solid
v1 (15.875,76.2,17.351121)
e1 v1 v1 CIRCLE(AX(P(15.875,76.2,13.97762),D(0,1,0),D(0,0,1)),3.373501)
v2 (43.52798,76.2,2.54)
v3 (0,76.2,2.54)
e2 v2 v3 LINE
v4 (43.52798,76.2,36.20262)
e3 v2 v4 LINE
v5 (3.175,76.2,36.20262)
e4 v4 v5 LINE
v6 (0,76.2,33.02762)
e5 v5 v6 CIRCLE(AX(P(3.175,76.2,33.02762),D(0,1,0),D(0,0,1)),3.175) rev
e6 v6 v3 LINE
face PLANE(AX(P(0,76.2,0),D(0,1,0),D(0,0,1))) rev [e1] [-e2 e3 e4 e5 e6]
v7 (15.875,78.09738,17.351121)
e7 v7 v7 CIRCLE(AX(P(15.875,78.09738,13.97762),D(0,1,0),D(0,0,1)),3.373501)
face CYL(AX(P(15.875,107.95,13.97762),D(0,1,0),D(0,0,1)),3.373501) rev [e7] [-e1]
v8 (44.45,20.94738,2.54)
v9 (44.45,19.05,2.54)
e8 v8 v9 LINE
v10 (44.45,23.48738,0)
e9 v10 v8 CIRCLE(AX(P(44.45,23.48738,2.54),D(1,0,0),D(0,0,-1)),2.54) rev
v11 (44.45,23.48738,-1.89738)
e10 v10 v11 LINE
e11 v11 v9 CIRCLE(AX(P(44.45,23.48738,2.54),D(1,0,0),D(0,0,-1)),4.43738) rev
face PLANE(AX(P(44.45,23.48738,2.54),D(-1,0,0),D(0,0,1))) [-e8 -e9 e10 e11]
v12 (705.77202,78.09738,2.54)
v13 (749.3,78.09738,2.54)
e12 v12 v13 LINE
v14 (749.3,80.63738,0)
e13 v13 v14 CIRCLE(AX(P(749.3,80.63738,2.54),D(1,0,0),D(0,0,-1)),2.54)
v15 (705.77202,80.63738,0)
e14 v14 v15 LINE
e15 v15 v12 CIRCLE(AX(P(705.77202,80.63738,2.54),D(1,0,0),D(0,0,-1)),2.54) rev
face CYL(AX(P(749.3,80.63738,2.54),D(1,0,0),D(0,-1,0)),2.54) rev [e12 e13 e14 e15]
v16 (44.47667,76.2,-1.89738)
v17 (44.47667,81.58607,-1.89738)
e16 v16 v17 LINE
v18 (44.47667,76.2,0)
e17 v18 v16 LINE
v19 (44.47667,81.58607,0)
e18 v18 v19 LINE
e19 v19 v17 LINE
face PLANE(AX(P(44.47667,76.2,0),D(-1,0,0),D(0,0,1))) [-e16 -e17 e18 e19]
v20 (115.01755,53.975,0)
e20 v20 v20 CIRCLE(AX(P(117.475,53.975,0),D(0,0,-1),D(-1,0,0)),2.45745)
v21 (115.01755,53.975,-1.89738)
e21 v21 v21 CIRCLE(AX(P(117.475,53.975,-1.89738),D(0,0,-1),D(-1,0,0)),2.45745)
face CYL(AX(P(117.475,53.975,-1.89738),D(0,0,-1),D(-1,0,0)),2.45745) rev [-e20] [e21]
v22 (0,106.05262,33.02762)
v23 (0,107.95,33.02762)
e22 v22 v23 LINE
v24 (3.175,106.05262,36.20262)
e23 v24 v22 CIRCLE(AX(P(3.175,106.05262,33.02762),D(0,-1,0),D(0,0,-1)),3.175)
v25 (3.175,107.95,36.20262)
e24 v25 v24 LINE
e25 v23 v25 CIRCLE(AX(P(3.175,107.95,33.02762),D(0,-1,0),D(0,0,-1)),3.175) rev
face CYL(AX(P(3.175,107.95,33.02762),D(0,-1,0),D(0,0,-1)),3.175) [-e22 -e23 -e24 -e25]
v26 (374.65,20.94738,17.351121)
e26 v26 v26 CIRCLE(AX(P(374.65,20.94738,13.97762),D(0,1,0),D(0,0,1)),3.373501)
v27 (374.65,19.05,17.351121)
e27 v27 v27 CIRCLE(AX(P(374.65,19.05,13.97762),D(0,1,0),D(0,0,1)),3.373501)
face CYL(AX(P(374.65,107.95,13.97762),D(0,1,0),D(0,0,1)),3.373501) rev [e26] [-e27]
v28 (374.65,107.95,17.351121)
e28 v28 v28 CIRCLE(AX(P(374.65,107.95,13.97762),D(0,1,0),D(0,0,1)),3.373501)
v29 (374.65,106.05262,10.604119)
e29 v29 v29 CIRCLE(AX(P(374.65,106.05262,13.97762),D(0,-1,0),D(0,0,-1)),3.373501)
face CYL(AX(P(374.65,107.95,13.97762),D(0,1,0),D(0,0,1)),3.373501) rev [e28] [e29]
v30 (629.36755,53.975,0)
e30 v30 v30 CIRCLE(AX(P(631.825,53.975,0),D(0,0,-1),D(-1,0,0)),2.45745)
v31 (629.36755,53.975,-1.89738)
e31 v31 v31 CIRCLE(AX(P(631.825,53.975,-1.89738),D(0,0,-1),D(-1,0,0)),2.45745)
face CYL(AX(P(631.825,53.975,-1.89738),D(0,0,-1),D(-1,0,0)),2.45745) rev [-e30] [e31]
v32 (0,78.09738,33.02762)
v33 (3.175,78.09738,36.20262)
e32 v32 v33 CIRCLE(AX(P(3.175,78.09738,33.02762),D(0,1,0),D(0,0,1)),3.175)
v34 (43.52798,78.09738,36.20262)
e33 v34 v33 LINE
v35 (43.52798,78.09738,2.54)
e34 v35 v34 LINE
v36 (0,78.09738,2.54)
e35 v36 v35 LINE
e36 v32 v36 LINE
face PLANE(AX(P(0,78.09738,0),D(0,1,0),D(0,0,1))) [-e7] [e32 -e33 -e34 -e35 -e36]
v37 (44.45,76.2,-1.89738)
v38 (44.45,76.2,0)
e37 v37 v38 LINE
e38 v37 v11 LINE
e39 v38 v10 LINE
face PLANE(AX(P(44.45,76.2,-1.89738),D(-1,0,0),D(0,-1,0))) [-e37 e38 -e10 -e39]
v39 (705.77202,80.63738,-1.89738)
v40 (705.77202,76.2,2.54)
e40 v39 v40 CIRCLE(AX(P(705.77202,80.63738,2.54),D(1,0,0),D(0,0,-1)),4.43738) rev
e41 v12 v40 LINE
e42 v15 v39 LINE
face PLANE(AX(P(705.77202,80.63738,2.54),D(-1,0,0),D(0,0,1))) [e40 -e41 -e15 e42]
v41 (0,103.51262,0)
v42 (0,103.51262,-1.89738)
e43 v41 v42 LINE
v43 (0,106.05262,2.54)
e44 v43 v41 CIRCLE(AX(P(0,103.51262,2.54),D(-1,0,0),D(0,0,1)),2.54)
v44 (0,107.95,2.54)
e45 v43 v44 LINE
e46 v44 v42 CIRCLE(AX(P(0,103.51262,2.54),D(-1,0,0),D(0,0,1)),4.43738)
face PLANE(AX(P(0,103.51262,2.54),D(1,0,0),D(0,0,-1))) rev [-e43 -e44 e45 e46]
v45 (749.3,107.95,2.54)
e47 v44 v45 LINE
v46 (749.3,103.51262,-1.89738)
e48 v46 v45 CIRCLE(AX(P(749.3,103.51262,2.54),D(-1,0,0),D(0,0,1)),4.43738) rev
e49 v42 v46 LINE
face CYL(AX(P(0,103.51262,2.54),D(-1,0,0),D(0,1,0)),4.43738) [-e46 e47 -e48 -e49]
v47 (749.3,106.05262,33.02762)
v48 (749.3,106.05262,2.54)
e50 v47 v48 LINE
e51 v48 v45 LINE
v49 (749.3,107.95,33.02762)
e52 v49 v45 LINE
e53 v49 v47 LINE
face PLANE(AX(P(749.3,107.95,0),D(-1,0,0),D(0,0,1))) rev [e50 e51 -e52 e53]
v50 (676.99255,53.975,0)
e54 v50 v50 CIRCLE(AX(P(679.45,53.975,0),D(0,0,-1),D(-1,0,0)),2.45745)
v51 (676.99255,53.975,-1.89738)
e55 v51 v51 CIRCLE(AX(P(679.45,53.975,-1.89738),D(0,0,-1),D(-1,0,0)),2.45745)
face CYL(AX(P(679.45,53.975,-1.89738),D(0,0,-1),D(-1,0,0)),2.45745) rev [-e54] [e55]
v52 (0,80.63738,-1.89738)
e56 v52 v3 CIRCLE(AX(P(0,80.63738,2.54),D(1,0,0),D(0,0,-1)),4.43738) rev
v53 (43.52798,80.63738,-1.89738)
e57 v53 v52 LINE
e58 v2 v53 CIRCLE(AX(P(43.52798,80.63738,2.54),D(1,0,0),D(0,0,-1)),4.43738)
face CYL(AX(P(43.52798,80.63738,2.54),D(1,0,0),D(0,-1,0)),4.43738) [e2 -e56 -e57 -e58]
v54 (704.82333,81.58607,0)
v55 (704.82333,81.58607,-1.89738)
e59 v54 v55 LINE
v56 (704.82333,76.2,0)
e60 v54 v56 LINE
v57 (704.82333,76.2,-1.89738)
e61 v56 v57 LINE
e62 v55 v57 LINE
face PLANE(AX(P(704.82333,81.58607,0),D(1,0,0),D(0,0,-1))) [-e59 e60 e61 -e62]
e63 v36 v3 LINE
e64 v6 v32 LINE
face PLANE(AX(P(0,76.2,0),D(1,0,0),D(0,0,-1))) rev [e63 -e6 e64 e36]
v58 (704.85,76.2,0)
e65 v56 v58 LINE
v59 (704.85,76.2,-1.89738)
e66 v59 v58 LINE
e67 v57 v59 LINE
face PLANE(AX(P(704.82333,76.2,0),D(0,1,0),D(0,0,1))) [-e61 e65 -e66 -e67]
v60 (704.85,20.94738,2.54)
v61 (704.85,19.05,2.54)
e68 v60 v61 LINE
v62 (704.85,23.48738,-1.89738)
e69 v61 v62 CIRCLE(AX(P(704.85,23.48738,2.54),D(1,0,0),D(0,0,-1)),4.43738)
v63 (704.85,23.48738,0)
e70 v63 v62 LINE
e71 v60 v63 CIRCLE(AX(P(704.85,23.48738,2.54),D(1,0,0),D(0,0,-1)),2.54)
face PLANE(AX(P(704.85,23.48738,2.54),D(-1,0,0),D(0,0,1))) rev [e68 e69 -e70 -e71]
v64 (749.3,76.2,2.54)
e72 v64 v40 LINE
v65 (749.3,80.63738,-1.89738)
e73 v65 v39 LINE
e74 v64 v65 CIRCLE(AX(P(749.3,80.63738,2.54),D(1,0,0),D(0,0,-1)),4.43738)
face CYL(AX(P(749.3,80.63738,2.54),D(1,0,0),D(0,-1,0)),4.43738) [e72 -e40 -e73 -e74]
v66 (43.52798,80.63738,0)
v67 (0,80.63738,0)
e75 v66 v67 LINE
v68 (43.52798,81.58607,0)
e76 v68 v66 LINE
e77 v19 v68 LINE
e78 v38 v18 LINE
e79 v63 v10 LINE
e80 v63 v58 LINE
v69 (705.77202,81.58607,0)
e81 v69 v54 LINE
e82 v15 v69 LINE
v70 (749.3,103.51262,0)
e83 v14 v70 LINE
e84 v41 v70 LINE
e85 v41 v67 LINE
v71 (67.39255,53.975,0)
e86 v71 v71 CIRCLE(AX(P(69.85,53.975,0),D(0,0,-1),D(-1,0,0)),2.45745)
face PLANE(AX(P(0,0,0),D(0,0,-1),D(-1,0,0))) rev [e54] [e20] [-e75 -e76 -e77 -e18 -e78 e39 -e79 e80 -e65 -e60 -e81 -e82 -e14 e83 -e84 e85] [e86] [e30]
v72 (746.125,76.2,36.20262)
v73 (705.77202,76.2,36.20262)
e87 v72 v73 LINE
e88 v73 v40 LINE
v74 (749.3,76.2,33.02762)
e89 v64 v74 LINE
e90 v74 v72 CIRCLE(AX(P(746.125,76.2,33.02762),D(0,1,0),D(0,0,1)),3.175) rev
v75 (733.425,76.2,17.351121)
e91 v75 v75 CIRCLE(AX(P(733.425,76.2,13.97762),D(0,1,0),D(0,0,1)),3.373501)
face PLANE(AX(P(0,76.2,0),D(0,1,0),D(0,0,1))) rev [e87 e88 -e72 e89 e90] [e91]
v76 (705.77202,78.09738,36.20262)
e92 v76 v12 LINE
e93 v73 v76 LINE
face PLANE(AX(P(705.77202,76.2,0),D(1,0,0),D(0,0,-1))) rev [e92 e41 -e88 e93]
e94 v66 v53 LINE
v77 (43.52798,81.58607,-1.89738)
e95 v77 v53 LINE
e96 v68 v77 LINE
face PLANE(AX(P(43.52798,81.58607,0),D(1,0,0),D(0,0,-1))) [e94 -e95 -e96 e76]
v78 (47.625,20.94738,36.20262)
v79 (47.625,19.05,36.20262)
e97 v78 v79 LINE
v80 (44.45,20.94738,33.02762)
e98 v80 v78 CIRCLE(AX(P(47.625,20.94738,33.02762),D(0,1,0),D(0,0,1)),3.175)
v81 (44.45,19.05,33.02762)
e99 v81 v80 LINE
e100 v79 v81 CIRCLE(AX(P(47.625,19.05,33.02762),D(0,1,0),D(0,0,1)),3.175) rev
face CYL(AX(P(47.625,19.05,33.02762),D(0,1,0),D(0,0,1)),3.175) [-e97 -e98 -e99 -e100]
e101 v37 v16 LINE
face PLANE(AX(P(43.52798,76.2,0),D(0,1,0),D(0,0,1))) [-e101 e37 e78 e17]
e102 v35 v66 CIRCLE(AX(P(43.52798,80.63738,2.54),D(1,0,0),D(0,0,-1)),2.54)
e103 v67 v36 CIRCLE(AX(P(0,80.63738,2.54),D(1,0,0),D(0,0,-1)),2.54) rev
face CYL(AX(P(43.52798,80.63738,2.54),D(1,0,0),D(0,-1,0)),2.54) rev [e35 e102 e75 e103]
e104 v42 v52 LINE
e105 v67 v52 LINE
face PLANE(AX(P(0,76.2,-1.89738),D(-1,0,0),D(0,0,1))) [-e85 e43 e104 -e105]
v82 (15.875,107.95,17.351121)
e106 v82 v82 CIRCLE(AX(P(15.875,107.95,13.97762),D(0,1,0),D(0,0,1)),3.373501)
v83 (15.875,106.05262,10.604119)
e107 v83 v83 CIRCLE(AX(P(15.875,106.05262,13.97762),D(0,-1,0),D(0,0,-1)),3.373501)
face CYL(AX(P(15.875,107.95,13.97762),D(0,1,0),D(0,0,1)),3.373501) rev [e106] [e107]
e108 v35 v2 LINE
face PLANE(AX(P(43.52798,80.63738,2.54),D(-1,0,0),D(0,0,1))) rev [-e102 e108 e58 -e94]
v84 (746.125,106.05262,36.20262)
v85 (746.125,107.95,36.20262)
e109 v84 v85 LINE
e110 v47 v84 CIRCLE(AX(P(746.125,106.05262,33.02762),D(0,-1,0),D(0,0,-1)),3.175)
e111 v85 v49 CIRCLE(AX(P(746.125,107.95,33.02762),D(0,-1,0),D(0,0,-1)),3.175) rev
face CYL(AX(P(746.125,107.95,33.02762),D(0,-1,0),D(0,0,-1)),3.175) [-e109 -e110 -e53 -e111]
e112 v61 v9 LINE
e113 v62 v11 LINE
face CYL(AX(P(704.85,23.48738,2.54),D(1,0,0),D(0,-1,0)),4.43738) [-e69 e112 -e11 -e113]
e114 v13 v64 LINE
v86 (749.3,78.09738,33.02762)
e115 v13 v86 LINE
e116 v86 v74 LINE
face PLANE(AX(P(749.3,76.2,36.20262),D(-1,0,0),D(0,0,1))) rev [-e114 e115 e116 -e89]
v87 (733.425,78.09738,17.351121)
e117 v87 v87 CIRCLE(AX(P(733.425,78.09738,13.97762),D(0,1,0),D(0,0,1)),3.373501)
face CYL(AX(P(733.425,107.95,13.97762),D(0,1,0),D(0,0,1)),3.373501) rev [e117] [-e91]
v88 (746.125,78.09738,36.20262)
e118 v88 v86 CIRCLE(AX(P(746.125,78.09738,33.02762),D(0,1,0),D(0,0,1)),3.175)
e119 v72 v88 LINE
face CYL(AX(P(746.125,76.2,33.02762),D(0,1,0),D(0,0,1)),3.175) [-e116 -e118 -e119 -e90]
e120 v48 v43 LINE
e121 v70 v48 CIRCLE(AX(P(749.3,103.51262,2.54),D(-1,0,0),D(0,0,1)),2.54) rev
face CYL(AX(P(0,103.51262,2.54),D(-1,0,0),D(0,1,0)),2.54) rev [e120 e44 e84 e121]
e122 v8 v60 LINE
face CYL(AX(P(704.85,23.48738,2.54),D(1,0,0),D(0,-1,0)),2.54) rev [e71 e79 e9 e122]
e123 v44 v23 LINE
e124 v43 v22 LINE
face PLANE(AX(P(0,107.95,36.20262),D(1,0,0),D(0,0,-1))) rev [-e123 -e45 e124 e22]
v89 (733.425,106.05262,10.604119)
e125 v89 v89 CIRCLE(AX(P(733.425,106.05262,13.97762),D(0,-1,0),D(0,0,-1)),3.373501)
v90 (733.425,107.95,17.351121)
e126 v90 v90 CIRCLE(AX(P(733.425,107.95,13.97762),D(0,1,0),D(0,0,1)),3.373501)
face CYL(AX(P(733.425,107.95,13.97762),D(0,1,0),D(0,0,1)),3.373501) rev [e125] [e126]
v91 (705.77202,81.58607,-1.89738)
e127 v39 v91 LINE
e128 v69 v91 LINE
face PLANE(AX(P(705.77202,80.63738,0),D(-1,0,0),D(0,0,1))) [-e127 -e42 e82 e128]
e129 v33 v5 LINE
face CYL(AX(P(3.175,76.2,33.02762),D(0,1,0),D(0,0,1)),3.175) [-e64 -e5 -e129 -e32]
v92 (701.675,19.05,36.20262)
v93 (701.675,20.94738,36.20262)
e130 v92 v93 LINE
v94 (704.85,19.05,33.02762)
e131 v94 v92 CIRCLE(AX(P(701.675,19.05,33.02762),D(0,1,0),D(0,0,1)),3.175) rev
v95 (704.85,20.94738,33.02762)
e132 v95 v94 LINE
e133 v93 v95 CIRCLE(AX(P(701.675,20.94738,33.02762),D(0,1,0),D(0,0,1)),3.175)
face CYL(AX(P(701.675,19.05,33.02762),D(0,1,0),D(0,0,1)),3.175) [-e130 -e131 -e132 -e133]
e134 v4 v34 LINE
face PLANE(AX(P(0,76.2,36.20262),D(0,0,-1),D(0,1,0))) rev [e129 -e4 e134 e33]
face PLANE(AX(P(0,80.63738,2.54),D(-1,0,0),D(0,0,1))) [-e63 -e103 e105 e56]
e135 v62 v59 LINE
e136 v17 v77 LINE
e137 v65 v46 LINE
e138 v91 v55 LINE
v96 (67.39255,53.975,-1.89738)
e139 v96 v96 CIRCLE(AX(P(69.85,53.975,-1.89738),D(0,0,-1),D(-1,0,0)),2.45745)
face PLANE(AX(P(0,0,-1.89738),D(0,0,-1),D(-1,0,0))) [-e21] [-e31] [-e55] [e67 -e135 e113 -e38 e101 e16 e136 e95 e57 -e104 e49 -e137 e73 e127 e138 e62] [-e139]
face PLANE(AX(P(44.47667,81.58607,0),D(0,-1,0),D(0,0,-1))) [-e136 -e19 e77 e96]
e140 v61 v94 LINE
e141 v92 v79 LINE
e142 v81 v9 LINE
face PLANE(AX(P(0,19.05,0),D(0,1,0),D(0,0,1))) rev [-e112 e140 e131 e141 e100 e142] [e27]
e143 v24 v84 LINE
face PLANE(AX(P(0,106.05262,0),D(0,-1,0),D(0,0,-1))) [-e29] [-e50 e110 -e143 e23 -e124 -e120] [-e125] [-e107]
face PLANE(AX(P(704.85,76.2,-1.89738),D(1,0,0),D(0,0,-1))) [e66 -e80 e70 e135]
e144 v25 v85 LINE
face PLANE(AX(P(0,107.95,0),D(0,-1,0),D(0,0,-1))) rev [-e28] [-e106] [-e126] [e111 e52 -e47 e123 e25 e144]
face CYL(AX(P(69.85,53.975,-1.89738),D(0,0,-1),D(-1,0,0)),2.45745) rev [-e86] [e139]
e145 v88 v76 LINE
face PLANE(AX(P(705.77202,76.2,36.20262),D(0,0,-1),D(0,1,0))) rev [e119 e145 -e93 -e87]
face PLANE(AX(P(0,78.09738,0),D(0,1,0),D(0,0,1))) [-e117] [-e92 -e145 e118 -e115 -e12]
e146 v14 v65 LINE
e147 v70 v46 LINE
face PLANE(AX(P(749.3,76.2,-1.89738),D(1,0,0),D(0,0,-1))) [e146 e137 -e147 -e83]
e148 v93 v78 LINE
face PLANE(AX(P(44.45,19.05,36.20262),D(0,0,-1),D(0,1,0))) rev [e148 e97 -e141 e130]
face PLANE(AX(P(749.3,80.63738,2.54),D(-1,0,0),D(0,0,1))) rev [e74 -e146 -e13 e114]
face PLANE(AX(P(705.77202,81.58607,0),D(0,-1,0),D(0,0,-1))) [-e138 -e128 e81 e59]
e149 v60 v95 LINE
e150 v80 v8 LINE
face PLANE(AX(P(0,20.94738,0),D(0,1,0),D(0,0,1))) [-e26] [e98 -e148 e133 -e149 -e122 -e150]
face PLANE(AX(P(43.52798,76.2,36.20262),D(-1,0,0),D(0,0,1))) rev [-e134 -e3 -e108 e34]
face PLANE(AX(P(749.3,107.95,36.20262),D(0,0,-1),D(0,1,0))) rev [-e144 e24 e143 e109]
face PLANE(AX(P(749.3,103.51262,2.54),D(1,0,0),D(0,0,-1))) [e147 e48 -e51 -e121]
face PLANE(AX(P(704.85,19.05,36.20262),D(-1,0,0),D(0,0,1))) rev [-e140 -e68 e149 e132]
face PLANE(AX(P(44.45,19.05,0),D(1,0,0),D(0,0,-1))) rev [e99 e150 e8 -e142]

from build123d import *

# Parameters (mm, degrees)
BASE_FLANGE1_DEPTH               = 1.89738
EDGE_FLANGE1_DEPTH               = 749.3
EDGE_FLANGE1_2_DEPTH             = 44.47667
EDGE_FLANGE1_START               = 704.82333
EDGE_FLANGE1_3_DEPTH             = 44.47667
EDGE_FLANGE1_START_2             = 43.52798
EDGE_FLANGE1_4_DEPTH             = 0.94869
EDGE_FLANGE1_5_DEPTH             = 0.94869
EDGE_FLANGE1_START_3             = 44.45
EDGE_FLANGE1_6_DEPTH             = 660.4
EDGE_FLANGE1_7_DEPTH             = 749.3
EDGE_FLANGE1_8_DEPTH             = 43.52798
EDGE_FLANGE1_START_4             = 705.77202
EDGE_FLANGE1_9_DEPTH             = 43.52798
FILLET1_R                        = 3.175
F_10_0_1935_DIAMETER_HOLE1_D     = 4.9149
F_17_64_0_26563_DIAMETER_HOLE2_D = 6.747002


# Read off the part's stored shape, not the designer's step: Edge-Flange1
# Sheet-metal steps are written as plain solids
with BuildPart() as part:
    # Sketch1 → Base-Flange1 (new body)
    with BuildSketch(Plane.XY):
        Polygon((44.45, 19.05), (704.85, 19.05), (704.85, 76.2), (749.3, 76.2), (749.3, 107.95), (0, 107.95), (0, 76.2), (44.45, 76.2), align=None)
    extrude(amount=-BASE_FLANGE1_DEPTH)

    # Edge-Flange1 outline → Edge-Flange1 (cut)
    with BuildSketch(Plane.YZ):
        with BuildLine():
            Line((19.05, -1.89738), (23.48738, -1.89738))
            ThreePointArc((23.48738, -1.89738), (21.435625133, -1.394544857), (19.84887189, 0))
            Line((19.84887189, 0), (19.05, 0))
            Line((19.05, 0), (19.05, -1.89738))
        make_face()
        with BuildLine():
            ThreePointArc((107.15112811, 0), (105.564374867, -1.394544857), (103.51262, -1.89738))
            Line((103.51262, -1.89738), (107.95, -1.89738))
            Line((107.95, -1.89738), (107.95, 0))
            Line((107.95, 0), (107.15112811, 0))
        make_face()
    extrude(amount=EDGE_FLANGE1_DEPTH, mode=Mode.SUBTRACT)

    # Edge-Flange1 2 outline → Edge-Flange1 2 (cut)
    with BuildSketch(Plane.YZ):
        with BuildLine():
            Line((76.2, 0), (76.2, -1.89738))
            Line((76.2, -1.89738), (80.63738, -1.89738))
            ThreePointArc((80.63738, -1.89738), (78.585625133, -1.394544857), (76.99887189, 0))
            Line((76.99887189, 0), (76.2, 0))
        make_face()
    extrude(amount=EDGE_FLANGE1_2_DEPTH, mode=Mode.SUBTRACT)

    # Edge-Flange1 3 outline → Edge-Flange1 3 (cut)
    with BuildSketch(Plane.YZ.offset(EDGE_FLANGE1_START)):
        with BuildLine():
            Line((76.2, 0), (76.2, -1.89738))
            Line((76.2, -1.89738), (80.63738, -1.89738))
            ThreePointArc((80.63738, -1.89738), (78.585625133, -1.394544857), (76.99887189, 0))
            Line((76.99887189, 0), (76.2, 0))
        make_face()
    extrude(amount=EDGE_FLANGE1_3_DEPTH, mode=Mode.SUBTRACT)

    # Edge-Flange1 4 outline → Edge-Flange1 4 (cut)
    with BuildSketch(Plane.YZ.offset(EDGE_FLANGE1_START_2)):
        with BuildLine():
            ThreePointArc((76.99887189, 0), (78.585625133, -1.394544857), (80.63738, -1.89738))
            Line((80.63738, -1.89738), (81.58607, -1.89738))
            Line((81.58607, -1.89738), (81.58607, 0))
            Line((81.58607, 0), (76.99887189, 0))
        make_face()
    extrude(amount=EDGE_FLANGE1_4_DEPTH, mode=Mode.SUBTRACT)

    # Edge-Flange1 5 outline → Edge-Flange1 5 (cut)
    with BuildSketch(Plane.YZ.offset(EDGE_FLANGE1_START)):
        with BuildLine():
            ThreePointArc((76.99887189, 0), (78.585625133, -1.394544857), (80.63738, -1.89738))
            Line((80.63738, -1.89738), (81.58607, -1.89738))
            Line((81.58607, -1.89738), (81.58607, 0))
            Line((81.58607, 0), (76.99887189, 0))
        make_face()
    extrude(amount=EDGE_FLANGE1_5_DEPTH, mode=Mode.SUBTRACT)

    # Edge-Flange1 6 outline → Edge-Flange1 6 (add)
    with BuildSketch(Plane.YZ.offset(EDGE_FLANGE1_START_3)):
        with BuildLine():
            Line((19.84887189, 0), (23.48738, 0))
            ThreePointArc((23.48738, 0), (21.691328776, 0.743948776), (20.94738, 2.54))
            Line((20.94738, 2.54), (20.94738, 36.20262))
            Line((20.94738, 36.20262), (19.05, 36.20262))
            Line((19.05, 36.20262), (19.05, 2.54))
            ThreePointArc((19.05, 2.54), (19.254426871, 1.20866643), (19.84887189, 0))
        make_face()
        with BuildLine():
            ThreePointArc((106.05262, 2.54), (105.308671224, 0.743948776), (103.51262, 0))
            Line((103.51262, 0), (107.15112811, 0))
            ThreePointArc((107.15112811, 0), (107.745573129, 1.20866643), (107.95, 2.54))
            Line((107.95, 2.54), (107.95, 36.20262))
            Line((107.95, 36.20262), (106.05262, 36.20262))
            Line((106.05262, 36.20262), (106.05262, 2.54))
        make_face()
    extrude(amount=EDGE_FLANGE1_6_DEPTH)

    # Edge-Flange1 7 outline → Edge-Flange1 7 (add)
    with BuildSketch(Plane.YZ):
        with BuildLine():
            ThreePointArc((106.05262, 2.54), (105.308671224, 0.743948776), (103.51262, 0))
            Line((103.51262, 0), (107.15112811, 0))
            ThreePointArc((107.15112811, 0), (107.745573129, 1.20866643), (107.95, 2.54))
            Line((107.95, 2.54), (107.95, 36.20262))
            Line((107.95, 36.20262), (106.05262, 36.20262))
            Line((106.05262, 36.20262), (106.05262, 2.54))
        make_face()
    extrude(amount=EDGE_FLANGE1_7_DEPTH)

    # Edge-Flange1 8 outline → Edge-Flange1 8 (add)
    with BuildSketch(Plane.YZ):
        with BuildLine():
            ThreePointArc((76.2, 2.54), (76.404426871, 1.20866643), (76.99887189, 0))
            Line((76.99887189, 0), (80.63738, 0))
            ThreePointArc((80.63738, 0), (78.841328776, 0.743948776), (78.09738, 2.54))
            Line((78.09738, 2.54), (78.09738, 36.20262))
            Line((78.09738, 36.20262), (76.2, 36.20262))
            Line((76.2, 36.20262), (76.2, 2.54))
        make_face()
    extrude(amount=EDGE_FLANGE1_8_DEPTH)

    # Edge-Flange1 9 outline → Edge-Flange1 9 (add)
    with BuildSketch(Plane.YZ.offset(EDGE_FLANGE1_START_4)):
        with BuildLine():
            ThreePointArc((76.2, 2.54), (76.404426871, 1.20866643), (76.99887189, 0))
            Line((76.99887189, 0), (80.63738, 0))
            ThreePointArc((80.63738, 0), (78.841328776, 0.743948776), (78.09738, 2.54))
            Line((78.09738, 2.54), (78.09738, 36.20262))
            Line((78.09738, 36.20262), (76.2, 36.20262))
            Line((76.2, 36.20262), (76.2, 2.54))
        make_face()
    extrude(amount=EDGE_FLANGE1_9_DEPTH)

    # Fillet1
    fillet1_edges = [part.edges().sort_by_distance(p)[0] for p in [
        (749.3, 107.00131, 36.20262),
        (0, 107.00131, 36.20262),
        (0, 77.14869, 36.20262),
        (44.45, 19.99869, 36.20262),
        (704.85, 19.99869, 36.20262),
        (749.3, 77.14869, 36.20262),
    ]]
    fillet(fillet1_edges, radius=FILLET1_R)

    # #10 (0.1935) Diameter Hole1 (through all)
    with Locations(Plane(origin=(0, 0, -1.89738), x_dir=(-1, 0, 0), z_dir=(0, 0, -1))):
        with Locations((-679.45, 53.975), (-631.825, 53.975), (-117.475, 53.975), (-69.85, 53.975)):
            Hole(F_10_0_1935_DIAMETER_HOLE1_D / 2)

    # 17/64 (0.26563) Diameter Hole2 (through all)
    with Locations(Plane(origin=(0, 107.95, 0), x_dir=(1, 0, 0), z_dir=(0, 1, 0))):
        with Locations((733.425, -13.97762), (374.65, -13.97762), (15.875, -13.97762)):
            Hole(F_17_64_0_26563_DIAMETER_HOLE2_D / 2)


solid = part.part
